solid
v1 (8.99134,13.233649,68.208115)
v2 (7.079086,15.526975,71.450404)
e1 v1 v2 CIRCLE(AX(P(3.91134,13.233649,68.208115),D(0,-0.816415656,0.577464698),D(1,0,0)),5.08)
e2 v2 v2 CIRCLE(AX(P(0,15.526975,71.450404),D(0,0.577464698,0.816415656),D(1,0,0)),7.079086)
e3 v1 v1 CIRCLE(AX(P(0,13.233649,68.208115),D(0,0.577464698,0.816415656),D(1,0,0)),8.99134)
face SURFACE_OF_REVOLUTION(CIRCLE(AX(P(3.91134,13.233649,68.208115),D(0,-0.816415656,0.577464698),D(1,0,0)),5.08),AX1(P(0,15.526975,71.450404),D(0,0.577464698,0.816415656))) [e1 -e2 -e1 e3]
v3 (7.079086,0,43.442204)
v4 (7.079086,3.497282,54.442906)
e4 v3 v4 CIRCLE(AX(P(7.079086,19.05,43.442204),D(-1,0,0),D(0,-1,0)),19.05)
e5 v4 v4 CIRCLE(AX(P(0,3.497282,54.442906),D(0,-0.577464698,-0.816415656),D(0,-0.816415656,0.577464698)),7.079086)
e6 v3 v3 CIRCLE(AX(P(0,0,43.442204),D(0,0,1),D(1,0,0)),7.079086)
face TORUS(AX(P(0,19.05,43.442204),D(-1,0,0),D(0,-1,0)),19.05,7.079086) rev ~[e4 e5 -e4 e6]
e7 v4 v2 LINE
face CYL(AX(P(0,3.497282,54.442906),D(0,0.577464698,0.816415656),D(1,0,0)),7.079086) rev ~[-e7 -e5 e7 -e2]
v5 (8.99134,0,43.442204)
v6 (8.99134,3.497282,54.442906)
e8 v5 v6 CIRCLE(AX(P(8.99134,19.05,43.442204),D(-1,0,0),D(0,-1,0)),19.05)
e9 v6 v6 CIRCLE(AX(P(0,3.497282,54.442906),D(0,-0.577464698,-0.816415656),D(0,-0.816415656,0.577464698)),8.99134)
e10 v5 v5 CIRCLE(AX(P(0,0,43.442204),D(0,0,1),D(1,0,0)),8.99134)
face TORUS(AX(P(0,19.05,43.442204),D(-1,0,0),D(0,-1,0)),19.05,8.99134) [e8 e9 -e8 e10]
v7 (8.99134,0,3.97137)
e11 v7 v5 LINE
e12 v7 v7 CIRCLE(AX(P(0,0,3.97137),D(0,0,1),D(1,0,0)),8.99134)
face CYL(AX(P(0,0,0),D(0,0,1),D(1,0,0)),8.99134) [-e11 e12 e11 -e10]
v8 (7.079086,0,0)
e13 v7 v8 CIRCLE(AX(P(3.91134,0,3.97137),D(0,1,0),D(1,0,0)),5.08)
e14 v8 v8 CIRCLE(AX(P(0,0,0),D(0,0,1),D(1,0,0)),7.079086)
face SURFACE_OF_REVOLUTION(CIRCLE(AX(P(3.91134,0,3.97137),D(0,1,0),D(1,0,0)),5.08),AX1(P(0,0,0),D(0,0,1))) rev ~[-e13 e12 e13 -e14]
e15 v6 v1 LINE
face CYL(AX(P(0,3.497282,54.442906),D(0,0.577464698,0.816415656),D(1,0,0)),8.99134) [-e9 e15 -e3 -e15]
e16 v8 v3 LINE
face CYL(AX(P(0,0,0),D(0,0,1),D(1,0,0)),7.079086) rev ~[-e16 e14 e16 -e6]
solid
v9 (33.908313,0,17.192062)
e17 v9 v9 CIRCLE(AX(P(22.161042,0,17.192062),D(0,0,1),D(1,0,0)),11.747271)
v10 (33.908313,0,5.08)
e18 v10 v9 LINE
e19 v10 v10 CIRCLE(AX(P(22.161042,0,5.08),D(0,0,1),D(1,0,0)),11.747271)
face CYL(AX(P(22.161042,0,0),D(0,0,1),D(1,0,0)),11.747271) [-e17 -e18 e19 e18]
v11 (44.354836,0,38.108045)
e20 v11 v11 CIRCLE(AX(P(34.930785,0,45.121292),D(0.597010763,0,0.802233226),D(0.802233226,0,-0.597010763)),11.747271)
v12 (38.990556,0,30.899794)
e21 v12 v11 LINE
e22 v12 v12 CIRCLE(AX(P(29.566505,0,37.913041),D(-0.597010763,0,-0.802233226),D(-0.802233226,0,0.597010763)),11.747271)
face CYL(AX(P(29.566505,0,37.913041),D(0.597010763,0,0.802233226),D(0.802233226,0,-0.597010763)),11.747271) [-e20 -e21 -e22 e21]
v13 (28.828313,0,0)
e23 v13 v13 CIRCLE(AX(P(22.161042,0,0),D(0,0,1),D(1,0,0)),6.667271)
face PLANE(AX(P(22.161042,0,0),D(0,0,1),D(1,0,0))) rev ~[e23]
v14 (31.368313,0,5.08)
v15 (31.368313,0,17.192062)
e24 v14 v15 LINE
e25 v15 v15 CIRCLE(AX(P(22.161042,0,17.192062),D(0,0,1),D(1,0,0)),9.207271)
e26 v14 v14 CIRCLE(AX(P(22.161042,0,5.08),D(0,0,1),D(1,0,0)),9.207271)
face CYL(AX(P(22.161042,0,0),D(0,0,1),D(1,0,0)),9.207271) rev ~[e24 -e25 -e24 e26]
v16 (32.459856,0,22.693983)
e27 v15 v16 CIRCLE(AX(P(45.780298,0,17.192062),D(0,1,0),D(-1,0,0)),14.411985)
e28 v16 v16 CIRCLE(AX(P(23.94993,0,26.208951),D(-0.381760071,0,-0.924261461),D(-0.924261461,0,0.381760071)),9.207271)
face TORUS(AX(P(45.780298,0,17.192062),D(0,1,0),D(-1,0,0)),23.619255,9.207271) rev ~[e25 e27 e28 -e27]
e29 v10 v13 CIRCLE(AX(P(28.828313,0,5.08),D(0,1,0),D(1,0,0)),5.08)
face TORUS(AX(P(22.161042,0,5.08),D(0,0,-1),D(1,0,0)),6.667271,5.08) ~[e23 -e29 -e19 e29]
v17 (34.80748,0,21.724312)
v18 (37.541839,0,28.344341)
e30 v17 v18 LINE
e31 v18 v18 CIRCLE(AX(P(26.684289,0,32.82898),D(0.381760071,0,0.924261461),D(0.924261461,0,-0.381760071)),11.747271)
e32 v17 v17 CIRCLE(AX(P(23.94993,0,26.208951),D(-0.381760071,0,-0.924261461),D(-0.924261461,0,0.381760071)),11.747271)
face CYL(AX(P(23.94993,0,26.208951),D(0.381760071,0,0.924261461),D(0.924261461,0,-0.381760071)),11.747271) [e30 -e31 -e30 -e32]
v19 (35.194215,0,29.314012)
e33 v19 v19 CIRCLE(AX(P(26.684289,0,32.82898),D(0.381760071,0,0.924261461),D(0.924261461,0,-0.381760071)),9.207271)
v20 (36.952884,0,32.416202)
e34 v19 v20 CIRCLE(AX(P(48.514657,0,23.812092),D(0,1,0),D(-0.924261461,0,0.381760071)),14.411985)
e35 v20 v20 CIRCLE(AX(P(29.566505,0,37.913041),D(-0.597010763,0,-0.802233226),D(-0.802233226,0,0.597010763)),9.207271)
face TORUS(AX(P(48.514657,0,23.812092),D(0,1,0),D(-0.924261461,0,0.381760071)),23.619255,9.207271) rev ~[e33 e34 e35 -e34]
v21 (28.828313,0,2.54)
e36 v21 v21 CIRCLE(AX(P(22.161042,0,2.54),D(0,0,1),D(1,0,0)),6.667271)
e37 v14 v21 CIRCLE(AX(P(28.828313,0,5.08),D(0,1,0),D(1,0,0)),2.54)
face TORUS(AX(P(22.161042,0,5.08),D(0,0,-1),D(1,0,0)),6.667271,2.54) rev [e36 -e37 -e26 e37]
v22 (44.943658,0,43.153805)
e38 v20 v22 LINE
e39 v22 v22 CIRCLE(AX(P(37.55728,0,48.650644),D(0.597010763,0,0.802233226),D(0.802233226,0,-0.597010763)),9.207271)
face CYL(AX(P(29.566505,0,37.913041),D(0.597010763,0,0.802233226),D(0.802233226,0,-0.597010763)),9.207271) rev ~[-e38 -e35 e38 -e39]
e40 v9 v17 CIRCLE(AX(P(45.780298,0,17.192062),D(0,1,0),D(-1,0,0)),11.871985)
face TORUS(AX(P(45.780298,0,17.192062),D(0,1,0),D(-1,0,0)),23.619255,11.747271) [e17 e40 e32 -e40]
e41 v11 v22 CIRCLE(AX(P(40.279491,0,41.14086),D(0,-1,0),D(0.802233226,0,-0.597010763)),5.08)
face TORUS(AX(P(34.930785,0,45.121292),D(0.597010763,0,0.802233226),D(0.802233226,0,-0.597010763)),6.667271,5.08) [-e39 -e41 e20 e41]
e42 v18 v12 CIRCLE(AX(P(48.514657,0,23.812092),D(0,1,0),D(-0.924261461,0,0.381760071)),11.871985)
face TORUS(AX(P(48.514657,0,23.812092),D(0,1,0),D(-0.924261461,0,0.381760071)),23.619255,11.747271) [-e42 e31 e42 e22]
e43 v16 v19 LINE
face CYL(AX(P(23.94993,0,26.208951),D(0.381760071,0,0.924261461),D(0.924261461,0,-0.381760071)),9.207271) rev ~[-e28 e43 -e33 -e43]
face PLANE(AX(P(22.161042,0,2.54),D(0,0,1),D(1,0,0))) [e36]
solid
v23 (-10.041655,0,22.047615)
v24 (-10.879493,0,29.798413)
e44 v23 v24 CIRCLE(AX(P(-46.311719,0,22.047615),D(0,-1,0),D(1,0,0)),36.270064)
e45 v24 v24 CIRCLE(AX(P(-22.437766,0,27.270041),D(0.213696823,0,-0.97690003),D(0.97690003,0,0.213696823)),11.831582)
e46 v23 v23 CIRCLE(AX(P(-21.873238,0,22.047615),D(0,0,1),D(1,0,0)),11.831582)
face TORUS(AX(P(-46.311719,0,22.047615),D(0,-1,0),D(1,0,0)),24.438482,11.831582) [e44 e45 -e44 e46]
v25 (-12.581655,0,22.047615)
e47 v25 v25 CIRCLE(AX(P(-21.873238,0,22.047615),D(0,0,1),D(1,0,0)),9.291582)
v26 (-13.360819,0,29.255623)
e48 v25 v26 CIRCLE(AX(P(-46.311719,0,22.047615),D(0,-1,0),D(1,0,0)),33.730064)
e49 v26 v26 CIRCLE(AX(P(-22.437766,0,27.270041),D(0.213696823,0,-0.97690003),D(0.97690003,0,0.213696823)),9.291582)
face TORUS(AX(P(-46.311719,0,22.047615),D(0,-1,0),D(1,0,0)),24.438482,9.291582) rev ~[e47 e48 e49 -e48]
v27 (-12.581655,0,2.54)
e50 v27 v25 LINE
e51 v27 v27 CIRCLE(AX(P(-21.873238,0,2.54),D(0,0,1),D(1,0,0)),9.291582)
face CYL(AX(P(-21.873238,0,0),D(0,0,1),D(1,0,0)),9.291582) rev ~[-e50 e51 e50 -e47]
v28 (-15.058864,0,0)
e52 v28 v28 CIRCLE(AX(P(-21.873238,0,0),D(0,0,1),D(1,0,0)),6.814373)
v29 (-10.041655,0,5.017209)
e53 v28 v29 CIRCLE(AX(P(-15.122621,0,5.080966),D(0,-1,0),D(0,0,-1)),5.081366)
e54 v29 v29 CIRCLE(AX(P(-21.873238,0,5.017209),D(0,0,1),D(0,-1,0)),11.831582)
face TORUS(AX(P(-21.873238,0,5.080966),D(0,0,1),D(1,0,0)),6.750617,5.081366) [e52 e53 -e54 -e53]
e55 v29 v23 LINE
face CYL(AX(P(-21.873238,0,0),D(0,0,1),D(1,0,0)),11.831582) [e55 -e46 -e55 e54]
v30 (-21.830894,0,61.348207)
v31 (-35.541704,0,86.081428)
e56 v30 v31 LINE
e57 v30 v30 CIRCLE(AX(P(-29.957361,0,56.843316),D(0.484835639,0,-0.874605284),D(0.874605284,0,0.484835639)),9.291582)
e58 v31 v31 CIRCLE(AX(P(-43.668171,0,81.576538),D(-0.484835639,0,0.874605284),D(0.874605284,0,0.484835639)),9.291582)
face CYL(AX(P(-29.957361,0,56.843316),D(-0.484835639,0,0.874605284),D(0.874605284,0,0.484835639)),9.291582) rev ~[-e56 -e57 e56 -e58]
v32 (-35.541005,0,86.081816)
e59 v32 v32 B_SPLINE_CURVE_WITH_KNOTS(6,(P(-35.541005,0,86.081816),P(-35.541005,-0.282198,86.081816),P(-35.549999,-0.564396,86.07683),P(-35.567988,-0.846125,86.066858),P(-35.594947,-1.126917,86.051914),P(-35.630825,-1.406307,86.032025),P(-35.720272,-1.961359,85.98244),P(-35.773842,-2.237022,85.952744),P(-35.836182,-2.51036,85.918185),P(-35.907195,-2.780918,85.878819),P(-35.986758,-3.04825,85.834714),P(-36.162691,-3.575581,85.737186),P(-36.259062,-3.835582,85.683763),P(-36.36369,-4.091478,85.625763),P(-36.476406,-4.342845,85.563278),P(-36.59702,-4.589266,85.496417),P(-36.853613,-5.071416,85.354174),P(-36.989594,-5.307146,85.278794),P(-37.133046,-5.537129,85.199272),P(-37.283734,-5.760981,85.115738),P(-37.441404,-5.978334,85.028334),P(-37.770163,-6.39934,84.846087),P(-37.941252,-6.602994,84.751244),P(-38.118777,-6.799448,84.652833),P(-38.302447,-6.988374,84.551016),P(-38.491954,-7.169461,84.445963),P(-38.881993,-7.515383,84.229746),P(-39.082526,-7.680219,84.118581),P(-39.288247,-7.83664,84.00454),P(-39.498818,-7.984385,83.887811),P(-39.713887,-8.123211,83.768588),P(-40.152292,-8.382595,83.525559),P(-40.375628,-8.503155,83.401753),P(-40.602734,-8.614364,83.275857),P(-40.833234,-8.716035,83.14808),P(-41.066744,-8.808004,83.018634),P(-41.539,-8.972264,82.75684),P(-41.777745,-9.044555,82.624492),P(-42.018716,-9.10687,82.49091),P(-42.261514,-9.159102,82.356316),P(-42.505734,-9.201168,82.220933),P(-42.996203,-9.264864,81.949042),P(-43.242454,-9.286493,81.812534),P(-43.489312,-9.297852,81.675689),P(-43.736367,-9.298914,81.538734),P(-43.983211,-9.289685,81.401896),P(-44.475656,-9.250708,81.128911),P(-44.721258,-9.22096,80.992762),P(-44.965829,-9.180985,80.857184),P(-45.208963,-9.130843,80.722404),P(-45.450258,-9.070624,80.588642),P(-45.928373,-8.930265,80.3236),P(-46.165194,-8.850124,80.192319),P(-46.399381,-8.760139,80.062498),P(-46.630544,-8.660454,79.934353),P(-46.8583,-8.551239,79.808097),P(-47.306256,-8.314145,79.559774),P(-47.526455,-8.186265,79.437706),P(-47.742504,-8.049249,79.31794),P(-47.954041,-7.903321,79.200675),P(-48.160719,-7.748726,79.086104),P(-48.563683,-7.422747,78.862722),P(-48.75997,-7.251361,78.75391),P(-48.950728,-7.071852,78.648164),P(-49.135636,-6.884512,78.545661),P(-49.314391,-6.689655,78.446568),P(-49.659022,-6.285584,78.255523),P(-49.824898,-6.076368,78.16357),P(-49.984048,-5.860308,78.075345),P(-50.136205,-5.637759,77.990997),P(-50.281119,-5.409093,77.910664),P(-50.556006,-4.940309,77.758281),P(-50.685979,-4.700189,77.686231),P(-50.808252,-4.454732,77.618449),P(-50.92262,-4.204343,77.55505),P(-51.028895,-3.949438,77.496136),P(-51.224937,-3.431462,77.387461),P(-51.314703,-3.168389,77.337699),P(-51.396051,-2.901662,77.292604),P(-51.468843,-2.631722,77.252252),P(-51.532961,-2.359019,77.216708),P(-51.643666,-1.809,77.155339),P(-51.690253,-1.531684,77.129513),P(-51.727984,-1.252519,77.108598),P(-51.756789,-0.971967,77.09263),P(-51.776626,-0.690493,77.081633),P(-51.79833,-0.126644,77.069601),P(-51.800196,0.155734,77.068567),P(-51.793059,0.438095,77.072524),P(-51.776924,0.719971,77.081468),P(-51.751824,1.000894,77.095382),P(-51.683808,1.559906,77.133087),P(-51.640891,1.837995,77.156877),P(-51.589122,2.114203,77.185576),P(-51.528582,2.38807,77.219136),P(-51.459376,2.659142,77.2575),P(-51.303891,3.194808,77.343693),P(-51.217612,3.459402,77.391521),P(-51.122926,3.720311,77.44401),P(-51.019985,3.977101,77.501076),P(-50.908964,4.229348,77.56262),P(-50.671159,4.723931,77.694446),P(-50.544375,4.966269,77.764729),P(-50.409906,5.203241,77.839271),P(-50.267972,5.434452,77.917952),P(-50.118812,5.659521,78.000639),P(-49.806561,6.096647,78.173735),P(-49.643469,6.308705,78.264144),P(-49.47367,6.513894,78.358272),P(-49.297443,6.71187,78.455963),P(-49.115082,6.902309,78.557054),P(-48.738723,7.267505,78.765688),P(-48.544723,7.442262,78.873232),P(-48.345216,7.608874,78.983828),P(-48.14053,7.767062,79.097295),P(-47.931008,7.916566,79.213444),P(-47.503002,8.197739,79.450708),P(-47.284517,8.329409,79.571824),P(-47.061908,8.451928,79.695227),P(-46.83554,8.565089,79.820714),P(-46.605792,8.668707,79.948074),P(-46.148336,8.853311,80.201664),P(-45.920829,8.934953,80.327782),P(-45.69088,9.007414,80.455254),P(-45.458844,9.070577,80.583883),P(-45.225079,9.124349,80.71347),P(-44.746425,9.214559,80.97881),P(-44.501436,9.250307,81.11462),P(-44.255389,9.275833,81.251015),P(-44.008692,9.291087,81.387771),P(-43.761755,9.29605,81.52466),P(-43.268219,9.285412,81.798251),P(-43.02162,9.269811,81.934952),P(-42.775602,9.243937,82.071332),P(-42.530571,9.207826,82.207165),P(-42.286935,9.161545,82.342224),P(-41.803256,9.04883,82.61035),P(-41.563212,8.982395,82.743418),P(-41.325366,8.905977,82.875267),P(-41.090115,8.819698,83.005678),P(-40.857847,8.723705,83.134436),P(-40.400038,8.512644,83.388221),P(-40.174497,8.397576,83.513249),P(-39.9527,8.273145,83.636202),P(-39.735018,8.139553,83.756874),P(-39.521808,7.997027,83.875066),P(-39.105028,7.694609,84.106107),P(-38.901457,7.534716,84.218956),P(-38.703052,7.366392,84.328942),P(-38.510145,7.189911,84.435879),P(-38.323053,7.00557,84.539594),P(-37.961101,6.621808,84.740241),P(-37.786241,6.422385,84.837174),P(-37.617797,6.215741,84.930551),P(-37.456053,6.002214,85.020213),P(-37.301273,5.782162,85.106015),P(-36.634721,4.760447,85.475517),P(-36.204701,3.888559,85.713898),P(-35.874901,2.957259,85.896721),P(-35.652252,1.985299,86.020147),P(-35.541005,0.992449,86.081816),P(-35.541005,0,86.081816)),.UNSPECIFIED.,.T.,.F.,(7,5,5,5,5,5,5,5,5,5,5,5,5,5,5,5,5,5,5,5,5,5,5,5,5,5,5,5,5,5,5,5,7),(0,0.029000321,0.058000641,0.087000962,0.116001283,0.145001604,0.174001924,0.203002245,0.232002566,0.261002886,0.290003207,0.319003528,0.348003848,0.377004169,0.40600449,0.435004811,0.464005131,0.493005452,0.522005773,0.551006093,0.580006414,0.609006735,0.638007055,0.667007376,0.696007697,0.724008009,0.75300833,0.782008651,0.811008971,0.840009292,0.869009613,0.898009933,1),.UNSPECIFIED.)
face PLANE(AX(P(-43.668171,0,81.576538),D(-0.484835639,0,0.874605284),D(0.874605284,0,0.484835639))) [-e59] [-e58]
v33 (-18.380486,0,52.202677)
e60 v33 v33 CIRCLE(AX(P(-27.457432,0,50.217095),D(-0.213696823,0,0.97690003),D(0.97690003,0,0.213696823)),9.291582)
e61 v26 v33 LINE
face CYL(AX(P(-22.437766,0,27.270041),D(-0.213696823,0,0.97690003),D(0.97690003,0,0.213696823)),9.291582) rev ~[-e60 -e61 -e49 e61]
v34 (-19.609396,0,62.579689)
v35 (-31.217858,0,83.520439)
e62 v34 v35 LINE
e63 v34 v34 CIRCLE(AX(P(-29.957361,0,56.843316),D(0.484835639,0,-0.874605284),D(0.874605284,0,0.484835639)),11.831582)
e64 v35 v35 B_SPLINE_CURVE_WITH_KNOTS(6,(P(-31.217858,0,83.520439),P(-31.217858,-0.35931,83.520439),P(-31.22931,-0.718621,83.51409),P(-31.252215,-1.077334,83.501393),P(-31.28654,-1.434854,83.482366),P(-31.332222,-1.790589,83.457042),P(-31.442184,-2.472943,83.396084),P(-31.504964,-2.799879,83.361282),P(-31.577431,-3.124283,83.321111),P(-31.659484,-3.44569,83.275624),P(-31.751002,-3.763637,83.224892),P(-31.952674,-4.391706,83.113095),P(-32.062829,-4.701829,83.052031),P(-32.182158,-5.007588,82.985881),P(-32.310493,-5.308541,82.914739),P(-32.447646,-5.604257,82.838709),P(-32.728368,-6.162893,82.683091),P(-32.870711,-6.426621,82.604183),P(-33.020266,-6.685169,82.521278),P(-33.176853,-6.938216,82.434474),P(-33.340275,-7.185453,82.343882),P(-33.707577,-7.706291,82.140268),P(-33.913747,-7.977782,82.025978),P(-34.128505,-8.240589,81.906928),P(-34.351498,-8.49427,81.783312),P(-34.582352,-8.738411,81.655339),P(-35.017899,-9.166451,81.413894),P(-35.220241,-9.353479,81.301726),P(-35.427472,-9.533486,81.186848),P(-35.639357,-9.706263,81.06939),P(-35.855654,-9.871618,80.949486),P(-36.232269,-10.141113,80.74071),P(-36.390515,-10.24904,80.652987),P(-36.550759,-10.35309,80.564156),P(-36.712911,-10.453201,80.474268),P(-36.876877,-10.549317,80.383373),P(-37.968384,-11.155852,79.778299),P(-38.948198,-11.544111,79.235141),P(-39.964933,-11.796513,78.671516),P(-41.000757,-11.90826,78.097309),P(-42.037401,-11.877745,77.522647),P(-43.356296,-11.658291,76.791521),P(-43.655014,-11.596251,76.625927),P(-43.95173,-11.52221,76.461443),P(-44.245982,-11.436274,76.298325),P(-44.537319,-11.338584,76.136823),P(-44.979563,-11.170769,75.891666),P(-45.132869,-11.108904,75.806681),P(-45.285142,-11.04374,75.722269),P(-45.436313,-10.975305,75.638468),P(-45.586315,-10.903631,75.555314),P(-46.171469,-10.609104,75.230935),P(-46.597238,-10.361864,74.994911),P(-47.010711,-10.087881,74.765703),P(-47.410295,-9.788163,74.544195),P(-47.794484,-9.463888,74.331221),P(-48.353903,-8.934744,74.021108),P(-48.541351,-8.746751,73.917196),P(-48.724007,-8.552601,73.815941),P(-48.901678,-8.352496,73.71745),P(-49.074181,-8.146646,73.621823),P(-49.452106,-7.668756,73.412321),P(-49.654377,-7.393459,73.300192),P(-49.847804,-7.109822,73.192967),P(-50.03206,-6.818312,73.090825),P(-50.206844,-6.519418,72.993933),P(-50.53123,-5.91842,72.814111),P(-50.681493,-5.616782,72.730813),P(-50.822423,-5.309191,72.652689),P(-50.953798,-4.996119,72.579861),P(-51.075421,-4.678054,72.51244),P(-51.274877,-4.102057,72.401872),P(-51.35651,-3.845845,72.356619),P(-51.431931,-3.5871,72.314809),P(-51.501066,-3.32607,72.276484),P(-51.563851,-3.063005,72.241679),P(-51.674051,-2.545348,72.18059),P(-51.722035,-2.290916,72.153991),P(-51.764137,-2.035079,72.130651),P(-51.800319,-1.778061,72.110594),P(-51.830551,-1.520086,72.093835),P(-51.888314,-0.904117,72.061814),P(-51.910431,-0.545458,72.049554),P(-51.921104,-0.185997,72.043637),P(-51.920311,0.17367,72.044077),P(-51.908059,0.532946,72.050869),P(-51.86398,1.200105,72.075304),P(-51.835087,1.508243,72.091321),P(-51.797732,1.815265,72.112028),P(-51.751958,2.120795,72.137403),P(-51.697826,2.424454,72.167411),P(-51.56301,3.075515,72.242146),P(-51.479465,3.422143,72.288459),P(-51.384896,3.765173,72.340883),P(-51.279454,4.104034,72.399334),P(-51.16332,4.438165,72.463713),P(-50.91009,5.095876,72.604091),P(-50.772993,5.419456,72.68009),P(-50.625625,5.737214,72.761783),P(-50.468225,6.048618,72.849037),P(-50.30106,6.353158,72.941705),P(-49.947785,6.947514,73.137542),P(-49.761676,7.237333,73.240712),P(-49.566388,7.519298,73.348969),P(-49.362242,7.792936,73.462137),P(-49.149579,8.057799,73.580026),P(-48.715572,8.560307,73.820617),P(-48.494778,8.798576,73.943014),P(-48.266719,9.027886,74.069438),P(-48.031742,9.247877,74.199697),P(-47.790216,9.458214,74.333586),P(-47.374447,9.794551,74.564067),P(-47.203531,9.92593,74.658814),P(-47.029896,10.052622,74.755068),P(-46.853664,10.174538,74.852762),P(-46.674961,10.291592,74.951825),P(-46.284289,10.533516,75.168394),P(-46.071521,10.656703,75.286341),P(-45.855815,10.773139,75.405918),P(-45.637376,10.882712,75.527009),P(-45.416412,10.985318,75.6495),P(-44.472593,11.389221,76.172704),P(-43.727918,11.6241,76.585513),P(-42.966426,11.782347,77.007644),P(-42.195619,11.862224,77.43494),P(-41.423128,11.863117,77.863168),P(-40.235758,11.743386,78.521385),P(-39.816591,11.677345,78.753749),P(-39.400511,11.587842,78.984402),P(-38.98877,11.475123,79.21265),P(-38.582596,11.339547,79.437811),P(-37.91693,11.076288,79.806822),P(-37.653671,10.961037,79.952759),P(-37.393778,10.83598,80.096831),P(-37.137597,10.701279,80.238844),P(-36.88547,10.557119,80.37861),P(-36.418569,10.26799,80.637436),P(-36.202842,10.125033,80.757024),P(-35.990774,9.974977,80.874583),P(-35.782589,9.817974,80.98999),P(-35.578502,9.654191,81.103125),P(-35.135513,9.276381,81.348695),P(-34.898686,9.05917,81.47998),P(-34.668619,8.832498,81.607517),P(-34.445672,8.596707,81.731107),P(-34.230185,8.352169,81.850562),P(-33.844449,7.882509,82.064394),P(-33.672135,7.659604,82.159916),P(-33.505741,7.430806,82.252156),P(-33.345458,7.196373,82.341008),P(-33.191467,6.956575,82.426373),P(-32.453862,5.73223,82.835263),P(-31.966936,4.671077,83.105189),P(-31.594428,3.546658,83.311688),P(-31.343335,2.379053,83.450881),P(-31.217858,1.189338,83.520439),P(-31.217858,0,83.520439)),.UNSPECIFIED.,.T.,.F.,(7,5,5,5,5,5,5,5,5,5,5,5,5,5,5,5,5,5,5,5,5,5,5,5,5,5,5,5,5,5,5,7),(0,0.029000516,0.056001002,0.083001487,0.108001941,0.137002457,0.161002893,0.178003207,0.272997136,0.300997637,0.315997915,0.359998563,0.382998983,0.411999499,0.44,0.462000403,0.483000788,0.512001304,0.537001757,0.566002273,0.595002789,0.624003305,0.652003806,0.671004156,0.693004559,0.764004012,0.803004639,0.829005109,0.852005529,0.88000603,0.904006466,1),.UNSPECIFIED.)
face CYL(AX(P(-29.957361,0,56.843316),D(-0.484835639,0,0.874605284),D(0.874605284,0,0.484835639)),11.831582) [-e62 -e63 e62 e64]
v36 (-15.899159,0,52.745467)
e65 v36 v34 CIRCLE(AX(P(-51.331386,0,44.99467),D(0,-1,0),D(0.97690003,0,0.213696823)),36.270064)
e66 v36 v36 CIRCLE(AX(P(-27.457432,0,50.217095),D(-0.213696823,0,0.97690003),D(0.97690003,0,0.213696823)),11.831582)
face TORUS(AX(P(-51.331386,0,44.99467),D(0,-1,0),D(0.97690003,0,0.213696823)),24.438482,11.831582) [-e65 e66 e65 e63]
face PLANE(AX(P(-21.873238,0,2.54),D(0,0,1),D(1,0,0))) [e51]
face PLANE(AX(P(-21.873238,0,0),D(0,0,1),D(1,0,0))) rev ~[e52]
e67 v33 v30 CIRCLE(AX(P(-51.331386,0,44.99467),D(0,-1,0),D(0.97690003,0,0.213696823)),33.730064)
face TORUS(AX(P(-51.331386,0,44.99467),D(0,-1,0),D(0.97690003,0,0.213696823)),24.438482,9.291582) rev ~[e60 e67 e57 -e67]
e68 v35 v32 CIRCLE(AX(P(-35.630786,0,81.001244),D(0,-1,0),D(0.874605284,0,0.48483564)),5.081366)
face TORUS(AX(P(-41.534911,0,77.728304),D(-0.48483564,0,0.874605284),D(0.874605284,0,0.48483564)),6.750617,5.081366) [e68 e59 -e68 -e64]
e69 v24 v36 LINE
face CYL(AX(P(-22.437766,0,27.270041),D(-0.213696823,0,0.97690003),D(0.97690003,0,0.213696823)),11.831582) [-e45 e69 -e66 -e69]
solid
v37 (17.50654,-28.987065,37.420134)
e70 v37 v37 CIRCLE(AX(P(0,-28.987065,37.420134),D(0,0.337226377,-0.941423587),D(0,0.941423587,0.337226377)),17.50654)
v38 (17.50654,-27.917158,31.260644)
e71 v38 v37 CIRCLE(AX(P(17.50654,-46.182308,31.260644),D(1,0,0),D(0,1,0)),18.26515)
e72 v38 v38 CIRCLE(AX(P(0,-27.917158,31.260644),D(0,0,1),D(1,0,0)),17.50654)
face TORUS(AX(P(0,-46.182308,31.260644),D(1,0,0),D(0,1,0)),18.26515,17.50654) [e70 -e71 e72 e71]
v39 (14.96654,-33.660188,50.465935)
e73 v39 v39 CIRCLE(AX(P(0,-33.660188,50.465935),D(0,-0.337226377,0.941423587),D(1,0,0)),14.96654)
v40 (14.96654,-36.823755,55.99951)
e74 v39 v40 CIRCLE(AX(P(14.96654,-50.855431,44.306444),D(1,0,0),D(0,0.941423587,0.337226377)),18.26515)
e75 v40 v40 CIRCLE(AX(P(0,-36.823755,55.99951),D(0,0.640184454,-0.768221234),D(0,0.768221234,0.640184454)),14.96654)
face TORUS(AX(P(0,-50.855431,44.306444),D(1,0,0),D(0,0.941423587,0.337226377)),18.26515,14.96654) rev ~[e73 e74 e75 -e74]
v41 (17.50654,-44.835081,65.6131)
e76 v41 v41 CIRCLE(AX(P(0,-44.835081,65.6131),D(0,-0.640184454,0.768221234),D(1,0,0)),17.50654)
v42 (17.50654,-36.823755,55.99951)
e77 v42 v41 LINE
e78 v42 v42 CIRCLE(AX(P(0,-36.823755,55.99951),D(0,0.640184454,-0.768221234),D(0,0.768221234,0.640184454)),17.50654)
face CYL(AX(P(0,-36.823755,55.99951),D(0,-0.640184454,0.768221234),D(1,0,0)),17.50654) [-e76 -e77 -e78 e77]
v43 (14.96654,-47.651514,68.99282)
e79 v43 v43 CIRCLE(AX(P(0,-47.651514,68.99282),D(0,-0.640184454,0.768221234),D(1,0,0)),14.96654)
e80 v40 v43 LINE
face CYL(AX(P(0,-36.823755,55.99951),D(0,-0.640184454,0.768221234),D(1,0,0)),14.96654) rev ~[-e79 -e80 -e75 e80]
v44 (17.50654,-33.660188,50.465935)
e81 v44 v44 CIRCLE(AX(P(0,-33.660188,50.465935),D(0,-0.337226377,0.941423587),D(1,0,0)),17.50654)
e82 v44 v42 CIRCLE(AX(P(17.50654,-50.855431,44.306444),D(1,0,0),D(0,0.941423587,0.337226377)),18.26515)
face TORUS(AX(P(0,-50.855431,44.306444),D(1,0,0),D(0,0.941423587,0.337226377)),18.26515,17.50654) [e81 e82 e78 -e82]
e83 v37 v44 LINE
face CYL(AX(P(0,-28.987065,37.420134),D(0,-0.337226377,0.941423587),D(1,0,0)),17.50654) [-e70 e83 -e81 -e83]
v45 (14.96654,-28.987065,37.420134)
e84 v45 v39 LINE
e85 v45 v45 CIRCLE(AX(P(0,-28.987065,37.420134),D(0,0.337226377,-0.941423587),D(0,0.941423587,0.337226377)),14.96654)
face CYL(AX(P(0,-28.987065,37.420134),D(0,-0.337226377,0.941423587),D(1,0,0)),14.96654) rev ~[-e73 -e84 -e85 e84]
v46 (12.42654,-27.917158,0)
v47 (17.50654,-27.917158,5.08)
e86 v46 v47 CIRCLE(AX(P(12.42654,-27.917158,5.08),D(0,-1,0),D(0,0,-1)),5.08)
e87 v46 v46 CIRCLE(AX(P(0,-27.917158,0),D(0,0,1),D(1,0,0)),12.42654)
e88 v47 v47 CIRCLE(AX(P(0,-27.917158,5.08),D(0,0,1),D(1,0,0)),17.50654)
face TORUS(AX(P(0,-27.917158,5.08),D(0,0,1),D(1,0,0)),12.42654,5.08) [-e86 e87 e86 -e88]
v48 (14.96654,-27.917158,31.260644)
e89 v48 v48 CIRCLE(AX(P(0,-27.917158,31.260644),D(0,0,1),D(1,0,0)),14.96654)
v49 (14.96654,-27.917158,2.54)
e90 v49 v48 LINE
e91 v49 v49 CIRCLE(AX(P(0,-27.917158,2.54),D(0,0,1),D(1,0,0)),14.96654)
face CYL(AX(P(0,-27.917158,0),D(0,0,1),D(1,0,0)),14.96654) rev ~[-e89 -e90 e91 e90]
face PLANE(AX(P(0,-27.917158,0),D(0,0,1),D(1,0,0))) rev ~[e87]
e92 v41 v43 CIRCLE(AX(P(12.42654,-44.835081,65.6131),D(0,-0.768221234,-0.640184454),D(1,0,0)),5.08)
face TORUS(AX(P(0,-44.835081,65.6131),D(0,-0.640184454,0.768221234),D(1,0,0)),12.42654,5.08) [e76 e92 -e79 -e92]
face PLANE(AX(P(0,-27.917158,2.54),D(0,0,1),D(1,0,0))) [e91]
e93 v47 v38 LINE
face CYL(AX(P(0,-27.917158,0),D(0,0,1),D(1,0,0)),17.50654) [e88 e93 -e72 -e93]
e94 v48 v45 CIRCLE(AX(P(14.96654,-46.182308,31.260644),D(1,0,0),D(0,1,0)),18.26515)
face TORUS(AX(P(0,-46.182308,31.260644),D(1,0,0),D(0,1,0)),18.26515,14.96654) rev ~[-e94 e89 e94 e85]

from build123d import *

# Parameters (mm, degrees)
F1_R       = 8.9913396213
F1_R_2     = 7.079086412
F4_R       = 17.5065402818
F4_R_2     = 14.9658997185
F6_T       = -2.54
F8_R       = 11.8315822462
F8_R_2     = 9.4670155796
F10_T      = -2.54
F12_R      = 11.7472705606
F12_R_2    = 9.6747261676
F14_4_F1_R = 5.08
F15_T      = -2.54


# Not quite as in the source:
# - a fillet or chamfer that OpenCascade refuses, or shapes differently, is made with other operations: its cross-section is extruded or revolved along the edge and cut away or added


with BuildPart() as f2:
    # F2: sweep along a path in F0
    with BuildLine(Plane.YZ) as f2_path:
        Line((0, 0), (0, 43.4422037083))
        ThreePointArc((0, 43.4422037083), (0.8953617148, 49.2138246881), (3.4972817569, 54.4429061972))
        Line((3.4972817569, 54.4429061972), (15.5269746691, 71.4504040915))
    # F1 (on Top) → F2 (sweep)
    with BuildSketch(Plane.XY):
        Circle(F1_R)
        Circle(F1_R_2, mode=Mode.SUBTRACT)
    sweep(path=f2_path.line)

    # F14: fillet of radius 5.08 on 7 edges, made by hand

    # F14_s1 → F14_t2 (revolve, cut)
    with BuildSketch(Plane.XZ):
        with BuildLine():
            ThreePointArc((8.9913396213, 3.9713700747), (8.4883776208, 1.7674818852), (7.079086412, 0))
            Line((7.079086412, 0), (8.9913396213, 0))
            Line((8.9913396213, 0), (8.9913396213, 3.9713700747))
        make_face()
    revolve(axis=Axis((0, 0, 0), (0, 0, 1)), mode=Mode.SUBTRACT)

    # F14_s3 → F14_t4 (revolve, cut)
    with BuildSketch(Plane(origin=(0, -23.3361155073, 16.5060319315), x_dir=(1, 0, 0), z_dir=(0, -0.8164156558, 0.5774646976))):
        with BuildLine():
            ThreePointArc((8.9913396213, 63.3281381711), (8.4883776208, 65.5320263605), (7.079086412, 67.2995082457))
            Line((7.079086412, 67.2995082457), (8.9913396213, 67.2995082457))
            Line((8.9913396213, 67.2995082457), (8.9913396213, 63.3281381711))
        make_face()
    revolve(axis=Axis((0, 15.5269746691, 71.4504040915), (0, 0.5774646976, 0.8164156558)), mode=Mode.SUBTRACT)


with BuildPart() as f5:
    # F5: sweep along a path in F3
    with BuildLine(Plane.YZ) as f5_path:
        Line((-27.1323081106, 0), (-27.1323081106, 31.2606439181))
        ThreePointArc((-27.1323081106, 31.2606439181), (-27.4133513821, 34.5208223371), (-28.2481887745, 37.6848064035))
        Line((-28.2481887745, 37.6848064035), (-32.9213116109, 50.7306069746))
        ThreePointArc((-32.9213116109, 50.7306069746), (-34.317361824, 53.7613252226), (-36.2208164308, 56.5019583349))
        Line((-36.2208164308, 56.5019583349), (-47.0485761762, 69.4952681661))
    # F4 (on Top) → F5 (sweep)
    with BuildSketch(Plane.XY):
        with Locations((0, -27.9171578586)):
            Circle(F4_R)
        with Locations((0, -27.9171578586)):
            Circle(F4_R_2, mode=Mode.SUBTRACT)
        with Locations((0, -27.9171578586)):
            Circle(F4_R_2)
    sweep(path=f5_path.line)

    # F6
    f6_openings = [f5.faces().sort_by_distance(p)[0] for p in [
        (0, -47.651514, 68.99282),
    ]]
    offset(amount=F6_T, openings=f6_openings)

    # F14#2: fillet of radius 5.08 on 11 edges, made by hand

    # F14_2_s1 → F14_2_t2 (revolve, cut)
    with BuildSketch(Plane.XZ.offset(27.9171578586)):
        with BuildLine():
            ThreePointArc((12.4265402818, 0), (16.0186427302, 1.4878975516), (17.5065402818, 5.08))
            Line((17.5065402818, 5.08), (17.5065402818, 0))
            Line((17.5065402818, 0), (12.4265402818, 0))
        make_face()
    revolve(axis=Axis((0, -27.9171578586, 0), (0, 0, 1)), mode=Mode.SUBTRACT)

    # F14_2_s3 → F14_2_t4 (revolve, cut)
    with BuildSketch(Plane(origin=(0, 5.8086938174, 4.8405788754), x_dir=(1, 0, 0), z_dir=(0, -0.7682212344, -0.6401844538))):
        with BuildLine():
            ThreePointArc((17.5065402818, 79.1080986911), (16.825949333, 81.6480986911), (14.9665402818, 83.5075077423))
            Line((14.9665402818, 83.5075077423), (17.5065402818, 83.5075077423))
            Line((17.5065402818, 83.5075077423), (17.5065402818, 79.1080986911))
        make_face()
    revolve(axis=Axis((0, -47.6515144184, 68.9928195588), (0, -0.6401844538, 0.7682212344)), mode=Mode.SUBTRACT)


with BuildPart() as f9:
    # F9: sweep along a path in F7
    with BuildLine(Plane.XZ) as f9_path:
        Line((-20.9117194342, 0), (-20.9117194342, 22.0476153873))
        ThreePointArc((-20.9117194342, 22.0476153873), (-21.0588302623, 24.7773751701), (-21.498458684, 27.4755146992))
        Line((-21.498458684, 27.4755146992), (-26.5181254074, 50.422568823))
        ThreePointArc((-26.5181254074, 50.422568823), (-27.5664717226, 53.9606519945), (-29.1164119458, 57.3094947541))
        Line((-29.1164119458, 57.3094947541), (-42.8272224963, 82.0427164435))
    # F8 (on Top) → F9 (sweep)
    with BuildSketch(Plane.XY):
        with Locations((-21.8732375652, 0)):
            Circle(F8_R)
        with Locations((-21.8732375652, 0)):
            Circle(F8_R_2, mode=Mode.SUBTRACT)
        with Locations((-21.8732375652, 0)):
            Circle(F8_R_2)
    sweep(path=f9_path.line)

    # F10
    f10_openings = [f9.faces().sort_by_distance(p)[0] for p in [
        (-43.668171, 0, 81.576538),
    ]]
    offset(amount=F10_T, openings=f10_openings)

    # F14#3: fillet of radius 5.08 on 11 edges, made by hand

    # F14_3_s1 → F14_3_t2 (revolve, cut)
    with BuildSketch(Plane.XZ):
        with BuildLine():
            ThreePointArc((-15.1226210044, -0.0004), (-11.5295528705, 1.4878975516), (-10.0412553189, 5.0809656854))
            Line((-10.0412553189, 5.0809656854), (-9.5331187504, 5.0809656854))
            ThreePointArc((-9.5331187504, 5.0809656854), (-9.5335187504, 2.5404828427), (-9.5335187504, 0))
            Line((-9.5335187504, 0), (-10.0416553189, -0.5081365685))
            ThreePointArc((-10.0416553189, -0.5081365685), (-12.5821381617, -0.5081365685), (-15.1226210044, -0.5085365685))
            Line((-15.1226210044, -0.5085365685), (-15.1226210044, -0.0004))
        make_face()
    revolve(axis=Axis((-21.8732375652, 0, 0), (0, 0, 1)), mode=Mode.SUBTRACT)

    # F14_3_s3 → F14_3_t4 (revolve, cut)
    with BuildSketch(Plane.XZ):
        with BuildLine():
            ThreePointArc((-31.186596544, 83.4648708666), (-33.0135796202, 85.3567584566), (-35.5416973926, 86.0818283444))
            Line((-35.5416973926, 86.0818283444), (-35.5327885497, 86.5898868103))
            ThreePointArc((-35.5327885497, 86.5898868103), (-34.677230936, 87.1416370886), (-33.5665697026, 87.7573298579))
            Line((-33.5665697026, 87.7573298579), (-32.8757880566, 87.5592736483))
            ThreePointArc((-32.8757880566, 87.5592736483), (-31.8091577575, 85.6351566494), (-30.7421776162, 83.7112335847))
            Line((-30.7421776162, 83.7112335847), (-31.186596544, 83.4648708666))
        make_face()
    revolve(axis=Axis((-43.6681713342, 0, 81.5765381856), (-0.4848356395, 0, 0.8746052839)), mode=Mode.SUBTRACT)


with BuildPart() as f13:
    # F13: sweep along a path in F11
    with BuildLine(Plane.XZ) as f13_path:
        Line((20.3802976757, 0), (20.3802976757, 17.1920623273))
        ThreePointArc((20.3802976757, 17.1920623273), (20.8658789176, 22.1349094772), (22.3040565692, 26.8887681343))
        Line((22.3040565692, 26.8887681343), (25.0384157544, 33.5087973258))
        ThreePointArc((25.0384157544, 33.5087973258), (26.4184204613, 36.3387166417), (28.1379329132, 38.9761648884))
        Line((28.1379329132, 38.9761648884), (36.1287072301, 49.713768065))
    # F12 (on Top) → F13 (sweep)
    with BuildSketch(Plane.XY):
        with Locations((22.1610423177, 0)):
            Circle(F12_R)
        with Locations((22.1610423177, 0)):
            Circle(F12_R_2, mode=Mode.SUBTRACT)
        with Locations((22.1610423177, 0)):
            Circle(F12_R_2)
    sweep(path=f13_path.line)

    # F14#4: fillet of radius 5.08 on 9 edges, made by hand

    # F14_4_f1
    f14_4_f1_edges = [f13.edges().sort_by_distance(p)[0] for p in [
        (10.4137717571, 0, 0),
    ]]
    fillet(f14_4_f1_edges, radius=F14_4_F1_R)

    # F15
    f15_openings = [f13.faces().sort_by_distance(p)[0] for p in [
        (37.55728, 0, 48.650644),
    ]]
    offset(amount=F15_T, openings=f15_openings)

    # F16: fillet of radius 5.08 on 3 edges, made by hand

    # F16_s1 → F16_t2 (revolve, cut)
    with BuildSketch(Plane.XZ):
        with BuildLine():
            ThreePointArc((44.3548359588, 38.1080452757), (45.3252506231, 40.5520377918), (44.9436581166, 43.1538047296))
            Line((44.9436581166, 43.1538047296), (46.9813305114, 41.6373973926))
            Line((46.9813305114, 41.6373973926), (44.3548359588, 38.1080452757))
        make_face()
    revolve(axis=Axis((37.5572797495, 0, 48.6506443483), (0.5970107626, 0, 0.8022332263)), mode=Mode.SUBTRACT)


solid = Compound([f2.part, f5.part, f9.part, f13.part])
